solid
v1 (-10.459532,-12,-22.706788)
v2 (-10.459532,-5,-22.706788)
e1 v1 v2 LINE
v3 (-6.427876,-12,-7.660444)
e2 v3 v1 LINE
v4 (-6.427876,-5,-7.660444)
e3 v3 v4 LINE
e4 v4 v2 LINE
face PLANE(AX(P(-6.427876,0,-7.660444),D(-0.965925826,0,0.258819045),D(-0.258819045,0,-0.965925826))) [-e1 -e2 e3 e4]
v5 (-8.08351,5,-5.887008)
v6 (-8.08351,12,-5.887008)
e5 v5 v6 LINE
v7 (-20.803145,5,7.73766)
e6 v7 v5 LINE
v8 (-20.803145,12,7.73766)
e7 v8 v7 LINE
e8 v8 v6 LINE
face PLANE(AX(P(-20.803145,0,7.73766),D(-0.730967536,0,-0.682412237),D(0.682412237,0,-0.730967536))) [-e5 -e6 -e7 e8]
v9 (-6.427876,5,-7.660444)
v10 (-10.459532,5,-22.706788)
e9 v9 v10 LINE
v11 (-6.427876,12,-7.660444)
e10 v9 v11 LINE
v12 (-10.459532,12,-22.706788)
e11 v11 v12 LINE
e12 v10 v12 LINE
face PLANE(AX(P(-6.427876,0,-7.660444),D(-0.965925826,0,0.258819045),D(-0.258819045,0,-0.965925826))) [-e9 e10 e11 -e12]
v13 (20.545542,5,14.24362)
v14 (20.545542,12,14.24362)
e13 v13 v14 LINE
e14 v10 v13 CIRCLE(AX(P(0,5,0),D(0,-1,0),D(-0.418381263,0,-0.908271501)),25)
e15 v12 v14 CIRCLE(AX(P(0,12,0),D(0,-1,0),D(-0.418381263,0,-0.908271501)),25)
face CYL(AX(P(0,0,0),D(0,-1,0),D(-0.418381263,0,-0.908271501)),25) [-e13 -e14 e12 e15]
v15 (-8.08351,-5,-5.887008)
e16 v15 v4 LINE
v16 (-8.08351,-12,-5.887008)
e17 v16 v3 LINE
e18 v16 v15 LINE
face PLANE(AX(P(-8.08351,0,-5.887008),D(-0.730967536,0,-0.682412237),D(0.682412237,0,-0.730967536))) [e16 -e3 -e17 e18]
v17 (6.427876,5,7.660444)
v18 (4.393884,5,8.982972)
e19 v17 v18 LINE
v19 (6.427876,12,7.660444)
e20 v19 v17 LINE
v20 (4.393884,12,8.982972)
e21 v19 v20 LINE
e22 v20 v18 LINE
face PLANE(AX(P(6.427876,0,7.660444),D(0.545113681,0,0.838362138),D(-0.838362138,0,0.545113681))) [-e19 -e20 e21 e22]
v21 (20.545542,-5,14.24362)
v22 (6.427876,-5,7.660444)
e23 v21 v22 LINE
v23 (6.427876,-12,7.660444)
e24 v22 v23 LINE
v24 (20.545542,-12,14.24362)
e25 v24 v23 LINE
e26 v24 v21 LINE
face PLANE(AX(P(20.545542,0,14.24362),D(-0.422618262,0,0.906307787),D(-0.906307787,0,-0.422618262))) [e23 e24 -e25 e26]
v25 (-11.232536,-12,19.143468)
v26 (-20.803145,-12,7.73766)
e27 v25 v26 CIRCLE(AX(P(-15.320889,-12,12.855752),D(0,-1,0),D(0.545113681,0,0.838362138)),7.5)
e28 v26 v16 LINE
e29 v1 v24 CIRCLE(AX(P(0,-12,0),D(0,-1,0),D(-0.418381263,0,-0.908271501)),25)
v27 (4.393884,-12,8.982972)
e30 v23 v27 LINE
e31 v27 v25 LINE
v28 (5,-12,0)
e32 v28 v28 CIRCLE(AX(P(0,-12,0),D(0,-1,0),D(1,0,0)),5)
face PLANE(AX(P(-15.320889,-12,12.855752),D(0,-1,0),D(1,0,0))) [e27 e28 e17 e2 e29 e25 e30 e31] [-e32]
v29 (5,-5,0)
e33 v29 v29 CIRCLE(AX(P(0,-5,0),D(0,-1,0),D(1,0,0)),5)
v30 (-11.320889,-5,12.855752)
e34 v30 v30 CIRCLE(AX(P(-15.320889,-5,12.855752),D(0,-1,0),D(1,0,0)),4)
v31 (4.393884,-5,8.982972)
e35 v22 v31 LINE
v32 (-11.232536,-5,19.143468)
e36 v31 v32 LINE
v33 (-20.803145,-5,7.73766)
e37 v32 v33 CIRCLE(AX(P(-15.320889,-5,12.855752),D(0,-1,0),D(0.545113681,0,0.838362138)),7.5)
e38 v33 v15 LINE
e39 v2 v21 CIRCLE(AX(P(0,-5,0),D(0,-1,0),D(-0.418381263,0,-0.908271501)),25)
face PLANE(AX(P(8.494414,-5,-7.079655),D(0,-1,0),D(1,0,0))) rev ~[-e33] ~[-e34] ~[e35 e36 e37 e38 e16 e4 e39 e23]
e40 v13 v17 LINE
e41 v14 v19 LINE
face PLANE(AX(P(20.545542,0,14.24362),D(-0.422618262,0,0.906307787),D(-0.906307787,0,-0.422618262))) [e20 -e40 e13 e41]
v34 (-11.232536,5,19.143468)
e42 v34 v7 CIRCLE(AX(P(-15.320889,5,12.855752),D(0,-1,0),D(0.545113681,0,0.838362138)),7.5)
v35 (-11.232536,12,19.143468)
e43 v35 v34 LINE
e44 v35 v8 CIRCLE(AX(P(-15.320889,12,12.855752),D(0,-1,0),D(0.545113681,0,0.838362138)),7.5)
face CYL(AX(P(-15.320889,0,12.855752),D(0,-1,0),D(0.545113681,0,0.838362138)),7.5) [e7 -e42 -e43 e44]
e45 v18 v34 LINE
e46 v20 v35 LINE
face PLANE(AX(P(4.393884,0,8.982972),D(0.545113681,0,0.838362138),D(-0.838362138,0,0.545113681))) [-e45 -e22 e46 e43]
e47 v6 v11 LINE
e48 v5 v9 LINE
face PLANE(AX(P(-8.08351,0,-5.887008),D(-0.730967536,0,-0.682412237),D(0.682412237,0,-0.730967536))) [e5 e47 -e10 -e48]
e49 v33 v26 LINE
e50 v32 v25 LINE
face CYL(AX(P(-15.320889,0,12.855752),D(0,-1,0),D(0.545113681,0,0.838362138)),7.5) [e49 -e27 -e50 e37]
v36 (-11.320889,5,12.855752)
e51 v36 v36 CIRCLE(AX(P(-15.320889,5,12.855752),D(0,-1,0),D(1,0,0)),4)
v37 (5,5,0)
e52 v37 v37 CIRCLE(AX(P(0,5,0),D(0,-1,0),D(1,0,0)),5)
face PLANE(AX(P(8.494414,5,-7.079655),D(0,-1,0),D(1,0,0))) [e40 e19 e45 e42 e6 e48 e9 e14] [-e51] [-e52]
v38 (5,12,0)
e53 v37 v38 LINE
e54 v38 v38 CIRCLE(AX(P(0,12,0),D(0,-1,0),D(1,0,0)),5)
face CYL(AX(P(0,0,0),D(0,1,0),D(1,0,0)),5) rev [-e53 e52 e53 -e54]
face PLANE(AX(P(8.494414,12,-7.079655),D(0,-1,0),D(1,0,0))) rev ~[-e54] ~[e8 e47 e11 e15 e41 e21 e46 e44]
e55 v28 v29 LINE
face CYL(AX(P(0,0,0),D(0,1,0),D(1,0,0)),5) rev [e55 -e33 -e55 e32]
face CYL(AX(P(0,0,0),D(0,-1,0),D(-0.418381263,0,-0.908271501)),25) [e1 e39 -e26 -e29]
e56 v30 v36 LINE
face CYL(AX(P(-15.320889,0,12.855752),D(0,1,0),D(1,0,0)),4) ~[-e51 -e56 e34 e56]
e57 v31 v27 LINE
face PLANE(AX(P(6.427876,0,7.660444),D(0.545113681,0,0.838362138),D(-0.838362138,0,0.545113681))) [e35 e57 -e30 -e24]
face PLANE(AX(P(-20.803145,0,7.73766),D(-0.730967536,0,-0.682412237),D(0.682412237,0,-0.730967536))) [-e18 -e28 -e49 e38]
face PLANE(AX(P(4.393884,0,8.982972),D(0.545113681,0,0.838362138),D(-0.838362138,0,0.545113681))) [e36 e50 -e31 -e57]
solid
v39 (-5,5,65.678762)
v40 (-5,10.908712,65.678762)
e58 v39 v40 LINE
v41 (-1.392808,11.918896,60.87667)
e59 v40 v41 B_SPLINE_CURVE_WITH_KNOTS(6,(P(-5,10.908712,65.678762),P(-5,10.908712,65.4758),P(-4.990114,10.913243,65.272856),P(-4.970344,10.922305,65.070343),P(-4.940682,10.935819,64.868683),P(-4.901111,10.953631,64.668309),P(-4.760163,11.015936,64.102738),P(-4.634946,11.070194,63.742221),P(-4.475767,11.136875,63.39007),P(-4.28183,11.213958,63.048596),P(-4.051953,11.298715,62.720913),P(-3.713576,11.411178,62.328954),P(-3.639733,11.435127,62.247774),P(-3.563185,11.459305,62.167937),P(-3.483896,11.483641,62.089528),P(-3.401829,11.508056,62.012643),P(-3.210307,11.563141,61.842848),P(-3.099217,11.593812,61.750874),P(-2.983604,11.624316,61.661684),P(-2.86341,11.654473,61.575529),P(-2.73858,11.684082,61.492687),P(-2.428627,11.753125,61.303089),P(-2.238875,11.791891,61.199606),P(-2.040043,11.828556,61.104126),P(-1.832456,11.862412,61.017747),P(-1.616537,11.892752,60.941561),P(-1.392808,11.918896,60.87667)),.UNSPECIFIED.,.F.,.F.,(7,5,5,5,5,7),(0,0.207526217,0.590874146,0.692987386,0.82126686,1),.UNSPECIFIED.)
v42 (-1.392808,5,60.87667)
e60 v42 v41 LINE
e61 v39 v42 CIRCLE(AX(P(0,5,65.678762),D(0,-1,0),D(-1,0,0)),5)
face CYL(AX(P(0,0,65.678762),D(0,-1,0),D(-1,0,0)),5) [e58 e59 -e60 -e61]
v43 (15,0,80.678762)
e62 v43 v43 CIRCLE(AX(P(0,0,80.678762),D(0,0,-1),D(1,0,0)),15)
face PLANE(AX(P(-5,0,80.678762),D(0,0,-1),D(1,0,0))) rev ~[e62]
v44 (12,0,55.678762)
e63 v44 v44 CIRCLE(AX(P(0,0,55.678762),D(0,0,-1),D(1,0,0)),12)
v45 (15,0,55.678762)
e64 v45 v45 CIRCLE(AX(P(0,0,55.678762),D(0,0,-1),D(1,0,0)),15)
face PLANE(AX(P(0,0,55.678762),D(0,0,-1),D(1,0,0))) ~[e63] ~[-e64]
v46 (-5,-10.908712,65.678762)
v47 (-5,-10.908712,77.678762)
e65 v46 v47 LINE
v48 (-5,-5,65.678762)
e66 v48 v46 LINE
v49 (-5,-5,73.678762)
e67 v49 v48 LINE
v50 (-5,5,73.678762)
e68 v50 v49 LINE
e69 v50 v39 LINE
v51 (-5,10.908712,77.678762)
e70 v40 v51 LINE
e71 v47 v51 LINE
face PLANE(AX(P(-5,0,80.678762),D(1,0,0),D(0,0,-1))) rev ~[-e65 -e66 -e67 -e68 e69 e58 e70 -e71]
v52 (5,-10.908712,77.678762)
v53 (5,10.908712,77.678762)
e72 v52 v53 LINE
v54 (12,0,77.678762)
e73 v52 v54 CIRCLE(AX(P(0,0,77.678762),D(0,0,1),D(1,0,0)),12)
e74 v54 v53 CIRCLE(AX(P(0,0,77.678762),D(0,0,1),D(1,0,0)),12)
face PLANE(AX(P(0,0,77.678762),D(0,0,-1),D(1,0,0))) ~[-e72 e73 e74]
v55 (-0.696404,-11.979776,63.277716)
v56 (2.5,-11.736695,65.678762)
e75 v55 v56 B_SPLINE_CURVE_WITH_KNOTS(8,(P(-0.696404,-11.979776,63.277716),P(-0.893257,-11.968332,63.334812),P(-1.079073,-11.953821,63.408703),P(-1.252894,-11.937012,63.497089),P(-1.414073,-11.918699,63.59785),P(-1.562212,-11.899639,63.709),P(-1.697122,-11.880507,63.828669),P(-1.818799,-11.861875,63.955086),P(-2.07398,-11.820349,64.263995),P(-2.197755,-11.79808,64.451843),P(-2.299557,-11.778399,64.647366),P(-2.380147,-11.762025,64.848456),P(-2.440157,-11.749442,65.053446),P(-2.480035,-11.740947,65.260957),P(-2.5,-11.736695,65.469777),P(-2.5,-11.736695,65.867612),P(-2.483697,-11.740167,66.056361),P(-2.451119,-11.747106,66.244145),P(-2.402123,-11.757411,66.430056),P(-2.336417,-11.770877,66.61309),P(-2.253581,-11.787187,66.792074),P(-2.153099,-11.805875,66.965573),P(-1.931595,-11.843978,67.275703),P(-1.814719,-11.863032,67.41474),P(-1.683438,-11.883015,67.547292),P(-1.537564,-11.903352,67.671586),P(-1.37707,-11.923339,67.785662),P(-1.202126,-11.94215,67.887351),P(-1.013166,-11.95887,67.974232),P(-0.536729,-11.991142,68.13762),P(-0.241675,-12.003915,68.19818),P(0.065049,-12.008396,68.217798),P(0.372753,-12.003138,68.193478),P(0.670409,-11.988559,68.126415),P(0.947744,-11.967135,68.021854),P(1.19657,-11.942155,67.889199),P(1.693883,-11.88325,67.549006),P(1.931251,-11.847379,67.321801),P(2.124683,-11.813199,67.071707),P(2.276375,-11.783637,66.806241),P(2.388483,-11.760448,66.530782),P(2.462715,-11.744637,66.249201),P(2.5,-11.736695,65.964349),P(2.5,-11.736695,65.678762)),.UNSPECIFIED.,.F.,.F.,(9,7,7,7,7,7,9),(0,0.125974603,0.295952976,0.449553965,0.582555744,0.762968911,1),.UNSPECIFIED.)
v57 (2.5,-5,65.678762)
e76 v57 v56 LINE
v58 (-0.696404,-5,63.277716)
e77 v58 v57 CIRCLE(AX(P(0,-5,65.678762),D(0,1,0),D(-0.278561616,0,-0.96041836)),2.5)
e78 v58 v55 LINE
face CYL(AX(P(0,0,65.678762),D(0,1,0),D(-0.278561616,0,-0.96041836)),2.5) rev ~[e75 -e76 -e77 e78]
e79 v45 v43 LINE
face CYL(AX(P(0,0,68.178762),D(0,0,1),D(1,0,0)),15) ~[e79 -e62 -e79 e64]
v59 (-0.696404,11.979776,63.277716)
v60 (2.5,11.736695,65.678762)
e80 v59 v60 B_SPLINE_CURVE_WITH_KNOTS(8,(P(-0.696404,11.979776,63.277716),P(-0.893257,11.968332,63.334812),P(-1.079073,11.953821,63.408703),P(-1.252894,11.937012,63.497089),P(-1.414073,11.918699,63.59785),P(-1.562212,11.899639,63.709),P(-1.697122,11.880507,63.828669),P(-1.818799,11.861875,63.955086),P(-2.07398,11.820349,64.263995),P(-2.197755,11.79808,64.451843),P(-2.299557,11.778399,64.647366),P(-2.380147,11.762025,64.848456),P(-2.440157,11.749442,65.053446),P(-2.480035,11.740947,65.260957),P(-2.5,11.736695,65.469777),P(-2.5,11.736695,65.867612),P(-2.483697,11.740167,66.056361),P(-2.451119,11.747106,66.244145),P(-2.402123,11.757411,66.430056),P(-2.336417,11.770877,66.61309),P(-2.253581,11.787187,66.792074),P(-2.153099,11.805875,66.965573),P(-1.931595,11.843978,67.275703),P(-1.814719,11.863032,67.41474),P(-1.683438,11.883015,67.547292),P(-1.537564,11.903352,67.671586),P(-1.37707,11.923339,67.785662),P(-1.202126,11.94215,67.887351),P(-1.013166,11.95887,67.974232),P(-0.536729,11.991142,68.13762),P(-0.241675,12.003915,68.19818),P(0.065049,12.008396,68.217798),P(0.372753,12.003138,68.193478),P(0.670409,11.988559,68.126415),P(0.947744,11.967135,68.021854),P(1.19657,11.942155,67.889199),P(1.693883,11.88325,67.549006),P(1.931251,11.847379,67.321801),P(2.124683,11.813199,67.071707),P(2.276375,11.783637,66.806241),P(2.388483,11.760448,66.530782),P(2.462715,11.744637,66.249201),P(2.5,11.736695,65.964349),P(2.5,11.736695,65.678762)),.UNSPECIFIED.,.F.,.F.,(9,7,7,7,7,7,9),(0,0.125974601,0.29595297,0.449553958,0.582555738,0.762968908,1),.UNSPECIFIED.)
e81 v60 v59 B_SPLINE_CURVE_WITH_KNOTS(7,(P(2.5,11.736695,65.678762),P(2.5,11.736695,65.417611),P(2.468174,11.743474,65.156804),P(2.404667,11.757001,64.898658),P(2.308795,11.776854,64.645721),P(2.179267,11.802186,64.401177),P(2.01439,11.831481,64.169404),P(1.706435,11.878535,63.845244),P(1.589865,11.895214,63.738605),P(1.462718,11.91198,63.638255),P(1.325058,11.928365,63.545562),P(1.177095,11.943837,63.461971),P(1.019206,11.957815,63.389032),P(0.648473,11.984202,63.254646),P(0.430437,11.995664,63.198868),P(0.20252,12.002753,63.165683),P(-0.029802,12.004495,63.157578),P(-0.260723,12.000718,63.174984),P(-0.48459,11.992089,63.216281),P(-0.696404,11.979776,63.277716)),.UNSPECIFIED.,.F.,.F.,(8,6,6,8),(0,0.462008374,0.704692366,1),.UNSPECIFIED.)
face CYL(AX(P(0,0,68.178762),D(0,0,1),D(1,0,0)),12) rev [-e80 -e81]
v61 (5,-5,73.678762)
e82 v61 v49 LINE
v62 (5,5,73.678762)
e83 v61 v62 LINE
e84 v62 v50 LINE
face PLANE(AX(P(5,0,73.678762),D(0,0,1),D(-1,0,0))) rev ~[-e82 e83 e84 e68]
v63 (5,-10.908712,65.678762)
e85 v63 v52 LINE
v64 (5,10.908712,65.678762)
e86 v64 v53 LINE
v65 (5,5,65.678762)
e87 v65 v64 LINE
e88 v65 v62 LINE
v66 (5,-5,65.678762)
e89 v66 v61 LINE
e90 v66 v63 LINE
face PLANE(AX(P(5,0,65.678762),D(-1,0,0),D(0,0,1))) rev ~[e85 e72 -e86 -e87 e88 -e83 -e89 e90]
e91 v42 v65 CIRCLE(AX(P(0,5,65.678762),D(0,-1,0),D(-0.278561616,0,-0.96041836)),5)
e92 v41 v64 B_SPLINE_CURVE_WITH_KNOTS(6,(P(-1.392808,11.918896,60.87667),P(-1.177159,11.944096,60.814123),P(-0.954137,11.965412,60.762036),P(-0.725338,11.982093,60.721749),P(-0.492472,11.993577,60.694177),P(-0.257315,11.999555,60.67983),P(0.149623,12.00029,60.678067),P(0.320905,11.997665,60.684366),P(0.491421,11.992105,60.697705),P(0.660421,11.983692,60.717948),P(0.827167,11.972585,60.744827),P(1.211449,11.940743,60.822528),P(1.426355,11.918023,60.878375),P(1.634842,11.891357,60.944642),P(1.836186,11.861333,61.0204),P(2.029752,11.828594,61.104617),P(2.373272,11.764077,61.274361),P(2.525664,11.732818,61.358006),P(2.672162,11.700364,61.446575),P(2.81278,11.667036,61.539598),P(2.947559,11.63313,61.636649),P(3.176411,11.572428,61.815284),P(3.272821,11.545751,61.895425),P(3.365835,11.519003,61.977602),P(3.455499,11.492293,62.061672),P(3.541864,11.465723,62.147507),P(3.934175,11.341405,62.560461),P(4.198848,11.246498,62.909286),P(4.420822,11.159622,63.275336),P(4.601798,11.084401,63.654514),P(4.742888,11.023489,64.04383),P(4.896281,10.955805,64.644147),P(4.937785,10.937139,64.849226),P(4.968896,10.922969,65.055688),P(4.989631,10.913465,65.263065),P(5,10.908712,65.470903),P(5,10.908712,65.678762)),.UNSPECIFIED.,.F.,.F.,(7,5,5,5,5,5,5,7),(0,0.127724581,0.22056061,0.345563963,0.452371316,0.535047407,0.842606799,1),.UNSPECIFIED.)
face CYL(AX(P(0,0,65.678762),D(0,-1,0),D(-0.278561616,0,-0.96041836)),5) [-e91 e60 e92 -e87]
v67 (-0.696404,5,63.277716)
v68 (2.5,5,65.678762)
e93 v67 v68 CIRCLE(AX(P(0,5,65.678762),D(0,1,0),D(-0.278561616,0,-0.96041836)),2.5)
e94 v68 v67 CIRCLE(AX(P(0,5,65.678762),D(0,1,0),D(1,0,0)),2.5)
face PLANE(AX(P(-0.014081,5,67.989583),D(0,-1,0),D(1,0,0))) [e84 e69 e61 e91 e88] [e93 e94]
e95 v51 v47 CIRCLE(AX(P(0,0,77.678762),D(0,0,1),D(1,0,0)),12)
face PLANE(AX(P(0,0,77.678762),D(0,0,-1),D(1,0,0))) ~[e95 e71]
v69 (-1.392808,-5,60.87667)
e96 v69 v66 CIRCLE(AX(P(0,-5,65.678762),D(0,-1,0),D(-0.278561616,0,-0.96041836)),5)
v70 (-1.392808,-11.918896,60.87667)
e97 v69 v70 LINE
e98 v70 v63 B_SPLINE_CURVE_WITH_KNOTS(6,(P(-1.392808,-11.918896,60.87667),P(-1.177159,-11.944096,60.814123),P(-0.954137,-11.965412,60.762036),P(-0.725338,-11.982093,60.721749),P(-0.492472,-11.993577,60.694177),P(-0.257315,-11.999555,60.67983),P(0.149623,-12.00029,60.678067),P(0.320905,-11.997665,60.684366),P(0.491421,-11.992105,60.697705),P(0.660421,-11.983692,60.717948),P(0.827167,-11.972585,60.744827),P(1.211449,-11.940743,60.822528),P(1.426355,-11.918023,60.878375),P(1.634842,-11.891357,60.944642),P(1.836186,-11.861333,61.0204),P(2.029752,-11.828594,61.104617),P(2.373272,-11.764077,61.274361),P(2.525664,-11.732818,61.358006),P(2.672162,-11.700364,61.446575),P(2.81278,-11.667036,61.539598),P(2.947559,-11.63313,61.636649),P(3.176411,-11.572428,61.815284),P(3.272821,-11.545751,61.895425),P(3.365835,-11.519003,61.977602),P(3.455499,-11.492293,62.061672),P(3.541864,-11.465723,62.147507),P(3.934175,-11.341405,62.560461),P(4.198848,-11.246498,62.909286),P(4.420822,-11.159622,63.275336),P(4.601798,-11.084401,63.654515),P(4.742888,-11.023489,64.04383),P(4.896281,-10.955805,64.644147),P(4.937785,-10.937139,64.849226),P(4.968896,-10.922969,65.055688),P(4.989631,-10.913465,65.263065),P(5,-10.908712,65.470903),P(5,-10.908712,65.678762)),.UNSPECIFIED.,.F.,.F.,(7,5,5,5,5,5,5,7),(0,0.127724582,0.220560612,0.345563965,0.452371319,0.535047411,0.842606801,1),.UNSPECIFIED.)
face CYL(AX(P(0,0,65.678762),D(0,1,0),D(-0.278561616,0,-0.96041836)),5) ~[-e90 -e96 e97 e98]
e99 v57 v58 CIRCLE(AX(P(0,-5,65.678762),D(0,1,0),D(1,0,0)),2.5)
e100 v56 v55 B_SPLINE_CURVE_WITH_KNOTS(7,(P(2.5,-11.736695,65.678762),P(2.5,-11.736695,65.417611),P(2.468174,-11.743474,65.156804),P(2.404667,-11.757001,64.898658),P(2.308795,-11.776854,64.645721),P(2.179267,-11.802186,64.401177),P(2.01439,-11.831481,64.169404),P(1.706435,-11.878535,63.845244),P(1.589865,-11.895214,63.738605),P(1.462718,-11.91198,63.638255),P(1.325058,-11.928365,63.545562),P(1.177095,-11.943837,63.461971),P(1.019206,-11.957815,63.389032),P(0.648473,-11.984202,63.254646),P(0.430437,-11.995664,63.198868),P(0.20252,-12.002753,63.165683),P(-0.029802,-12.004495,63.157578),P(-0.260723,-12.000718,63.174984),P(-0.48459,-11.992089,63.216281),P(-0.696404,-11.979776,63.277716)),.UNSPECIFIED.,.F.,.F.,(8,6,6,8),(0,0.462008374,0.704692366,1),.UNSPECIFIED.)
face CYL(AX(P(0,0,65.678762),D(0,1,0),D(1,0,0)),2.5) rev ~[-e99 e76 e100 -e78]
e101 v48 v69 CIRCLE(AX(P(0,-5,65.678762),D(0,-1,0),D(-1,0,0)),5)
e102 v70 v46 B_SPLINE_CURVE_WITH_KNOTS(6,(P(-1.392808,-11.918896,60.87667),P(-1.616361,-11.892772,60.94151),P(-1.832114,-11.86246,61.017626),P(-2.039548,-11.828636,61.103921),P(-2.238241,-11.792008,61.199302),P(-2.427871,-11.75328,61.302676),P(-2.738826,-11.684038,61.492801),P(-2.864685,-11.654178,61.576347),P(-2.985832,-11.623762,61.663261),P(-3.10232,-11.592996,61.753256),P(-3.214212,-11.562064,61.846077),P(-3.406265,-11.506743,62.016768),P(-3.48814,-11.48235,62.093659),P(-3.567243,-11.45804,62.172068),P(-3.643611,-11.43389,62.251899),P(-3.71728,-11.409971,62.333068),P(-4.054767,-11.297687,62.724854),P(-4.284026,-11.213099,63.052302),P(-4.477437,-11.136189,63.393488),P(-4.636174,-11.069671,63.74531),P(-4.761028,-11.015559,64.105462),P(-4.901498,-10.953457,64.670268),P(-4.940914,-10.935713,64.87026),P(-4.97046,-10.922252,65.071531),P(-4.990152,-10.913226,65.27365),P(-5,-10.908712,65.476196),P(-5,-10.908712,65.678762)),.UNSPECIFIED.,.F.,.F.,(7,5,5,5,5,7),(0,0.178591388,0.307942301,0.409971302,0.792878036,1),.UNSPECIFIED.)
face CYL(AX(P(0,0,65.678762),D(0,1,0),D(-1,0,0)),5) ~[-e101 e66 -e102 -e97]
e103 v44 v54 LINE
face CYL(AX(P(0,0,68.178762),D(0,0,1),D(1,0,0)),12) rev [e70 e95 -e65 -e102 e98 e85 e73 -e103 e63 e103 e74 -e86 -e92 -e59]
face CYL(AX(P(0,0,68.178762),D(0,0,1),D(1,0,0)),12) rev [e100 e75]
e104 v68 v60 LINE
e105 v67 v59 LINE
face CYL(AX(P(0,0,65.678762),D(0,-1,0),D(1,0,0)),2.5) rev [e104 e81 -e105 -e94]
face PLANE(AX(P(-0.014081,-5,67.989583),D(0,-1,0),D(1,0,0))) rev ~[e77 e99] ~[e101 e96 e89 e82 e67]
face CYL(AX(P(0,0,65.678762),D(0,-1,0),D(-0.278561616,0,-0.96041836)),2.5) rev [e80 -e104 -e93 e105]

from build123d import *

# Parameters (mm, degrees)
F2_W          = 15
F2_H          = 25
F4_T          = -3
F0_W          = 10
F0_H          = 7
F5_DEPTH      = 13.0000001
F5_DEPTH_BACK = 13.0000001
F1_R          = 5
F1_R_2        = 4
F6_DEPTH      = 12
F6_DEPTH_BACK = 12
F7_DEPTH      = 12
F8_DEPTH      = 5
F9_DEPTH      = 5


with BuildPart() as f3:
    # F2 (on Front) → F3 (revolve)
    with BuildSketch(Plane.XZ):
        with Locations((7.5, 68.178761995)):
            Rectangle(F2_W, F2_H)
    revolve(axis=Axis((0, 0, -11.7868287861), (0, 0, -1)))

    # F4
    f4_openings = [f3.faces().sort_by_distance(p)[0] for p in [
        (0, 0, 55.678762),
    ]]
    offset(amount=F4_T, openings=f4_openings)

    # F0 (on Front) → F5 (join, two sides)
    with BuildSketch(Plane.XZ) as f5_sk:
        with Locations((0, 77.178761995)):
            Rectangle(F0_W, F0_H)
        with BuildLine():
            Line((5, 73.678761995), (-5, 73.678761995))
            Line((-5, 73.678761995), (-5, 65.678761995))
            ThreePointArc((-5, 65.678761995), (-3.9977518928, 62.6757668562), (-1.3928080784, 60.8766701949))
            ThreePointArc((-1.3928080784, 60.8766701949), (3.0029951389, 61.6810101023), (5, 65.678761995))
            Line((5, 65.678761995), (5, 73.678761995))
        make_face()
        with BuildLine():
            ThreePointArc((2.5, 65.678761995), (1.5014975694, 63.6798860486), (-0.6964040392, 63.277716095))
            ThreePointArc((-0.6964040392, 63.277716095), (-1.5014975694, 67.6776379414), (2.5, 65.678761995))
        make_face(mode=Mode.SUBTRACT)
    extrude(amount=F5_DEPTH)
    extrude(f5_sk.sketch, amount=-F5_DEPTH_BACK)

    # F0 (on Front) → F8 (cut, symmetric)
    with BuildSketch(Plane.XZ):
        with BuildLine():
            Line((5, 73.678761995), (-5, 73.678761995))
            Line((-5, 73.678761995), (-5, 65.678761995))
            ThreePointArc((-5, 65.678761995), (-3.9977518928, 62.6757668562), (-1.3928080784, 60.8766701949))
            ThreePointArc((-1.3928080784, 60.8766701949), (3.0029951389, 61.6810101023), (5, 65.678761995))
            Line((5, 65.678761995), (5, 73.678761995))
        make_face()
        with BuildLine():
            ThreePointArc((2.5, 65.678761995), (1.5014975694, 63.6798860486), (-0.6964040392, 63.277716095))
            ThreePointArc((-0.6964040392, 63.277716095), (-1.5014975694, 67.6776379414), (2.5, 65.678761995))
        make_face(mode=Mode.SUBTRACT)
    extrude(amount=F8_DEPTH, both=True, mode=Mode.SUBTRACT)


with BuildPart() as f6:
    # F1 (on Front) → F6 (new body, two sides)
    with BuildSketch(Plane.XZ) as f6_sk:
        with BuildLine():
            Line((20.545541793, 14.2436200606), (6.4278760969, 7.6604444312))
            ThreePointArc((6.4278760969, 7.6604444312), (9.0630778704, 4.2261826174), (10, 0))
            ThreePointArc((10, 0), (4.2261826174, -9.0630778704), (-6.4278760969, -7.6604444312))
            Line((-6.4278760969, -7.6604444312), (-10.4595315751, -22.7067875145))
            ThreePointArc((-10.4595315751, -22.7067875145), (19.151111078, -16.0696902422), (20.545541793, 14.2436200606))
        make_face()
        with BuildLine():
            Line((6.4278760969, 7.6604444312), (4.3938839854, 8.9829718647))
            ThreePointArc((4.3938839854, 8.9829718647), (-7.6604444312, 6.4278760969), (-8.0835103905, -5.887007709))
            Line((-8.0835103905, -5.887007709), (-6.4278760969, -7.6604444312))
            ThreePointArc((-6.4278760969, -7.6604444312), (4.2261826174, -9.0630778704), (10, 0))
            ThreePointArc((10, 0), (9.0630778704, 4.2261826174), (6.4278760969, 7.6604444312))
        make_face()
        Circle(F1_R, mode=Mode.SUBTRACT)
        with BuildLine():
            ThreePointArc((-11.2325362548, 19.1434682303), (-8.7287479144, 16.4325772833), (-7.8208888624, 12.8557521937))
            ThreePointArc((-7.8208888624, 12.8557521937), (-12.5701547705, 5.8783986872), (-20.8031453839, 7.7376604173))
            Line((-20.8031453839, 7.7376604173), (-8.0835103905, -5.887007709))
            ThreePointArc((-8.0835103905, -5.887007709), (-7.6604444312, 6.4278760969), (4.3938839854, 8.9829718647))
            Line((4.3938839854, 8.9829718647), (-11.2325362548, 19.1434682303))
        make_face()
        with BuildLine():
            ThreePointArc((-20.8031453839, 7.7376604173), (-12.5701547705, 5.8783986872), (-7.8208888624, 12.8557521937))
            ThreePointArc((-7.8208888624, 12.8557521937), (-8.7287479144, 16.4325772833), (-11.2325362548, 19.1434682303))
            ThreePointArc((-11.2325362548, 19.1434682303), (-21.0662221858, 17.6766592664), (-20.8031453839, 7.7376604173))
        make_face()
        with Locations((-15.3208888624, 12.8557521937)):
            Circle(F1_R_2, mode=Mode.SUBTRACT)
    extrude(amount=F6_DEPTH)
    extrude(f6_sk.sketch, amount=-F6_DEPTH_BACK)

    # F1 (on Front) → F7 (join, symmetric)
    with BuildSketch(Plane.XZ):
        with Locations((-15.3208888624, 12.8557521937)):
            Circle(F1_R_2)
    extrude(amount=F7_DEPTH, both=True)

    # F1 (on Front) → F9 (cut, symmetric)
    with BuildSketch(Plane.XZ):
        with BuildLine():
            Line((20.545541793, 14.2436200606), (6.4278760969, 7.6604444312))
            ThreePointArc((6.4278760969, 7.6604444312), (9.0630778704, 4.2261826174), (10, 0))
            ThreePointArc((10, 0), (4.2261826174, -9.0630778704), (-6.4278760969, -7.6604444312))
            Line((-6.4278760969, -7.6604444312), (-10.4595315751, -22.7067875145))
            ThreePointArc((-10.4595315751, -22.7067875145), (19.151111078, -16.0696902422), (20.545541793, 14.2436200606))
        make_face()
        with BuildLine():
            ThreePointArc((-11.2325362548, 19.1434682303), (-8.7287479144, 16.4325772833), (-7.8208888624, 12.8557521937))
            ThreePointArc((-7.8208888624, 12.8557521937), (-12.5701547705, 5.8783986872), (-20.8031453839, 7.7376604173))
            Line((-20.8031453839, 7.7376604173), (-8.0835103905, -5.887007709))
            ThreePointArc((-8.0835103905, -5.887007709), (-7.6604444312, 6.4278760969), (4.3938839854, 8.9829718647))
            Line((4.3938839854, 8.9829718647), (-11.2325362548, 19.1434682303))
        make_face()
        with BuildLine():
            ThreePointArc((-20.8031453839, 7.7376604173), (-12.5701547705, 5.8783986872), (-7.8208888624, 12.8557521937))
            ThreePointArc((-7.8208888624, 12.8557521937), (-8.7287479144, 16.4325772833), (-11.2325362548, 19.1434682303))
            ThreePointArc((-11.2325362548, 19.1434682303), (-21.0662221858, 17.6766592664), (-20.8031453839, 7.7376604173))
        make_face()
        with Locations((-15.3208888624, 12.8557521937)):
            Circle(F1_R_2, mode=Mode.SUBTRACT)
        with BuildLine():
            Line((6.4278760969, 7.6604444312), (4.3938839854, 8.9829718647))
            ThreePointArc((4.3938839854, 8.9829718647), (-7.6604444312, 6.4278760969), (-8.0835103905, -5.887007709))
            Line((-8.0835103905, -5.887007709), (-6.4278760969, -7.6604444312))
            ThreePointArc((-6.4278760969, -7.6604444312), (4.2261826174, -9.0630778704), (10, 0))
            ThreePointArc((10, 0), (9.0630778704, 4.2261826174), (6.4278760969, 7.6604444312))
        make_face()
        Circle(F1_R, mode=Mode.SUBTRACT)
    extrude(amount=F9_DEPTH, both=True, mode=Mode.SUBTRACT)


solid = Compound([f3.part, f6.part])
